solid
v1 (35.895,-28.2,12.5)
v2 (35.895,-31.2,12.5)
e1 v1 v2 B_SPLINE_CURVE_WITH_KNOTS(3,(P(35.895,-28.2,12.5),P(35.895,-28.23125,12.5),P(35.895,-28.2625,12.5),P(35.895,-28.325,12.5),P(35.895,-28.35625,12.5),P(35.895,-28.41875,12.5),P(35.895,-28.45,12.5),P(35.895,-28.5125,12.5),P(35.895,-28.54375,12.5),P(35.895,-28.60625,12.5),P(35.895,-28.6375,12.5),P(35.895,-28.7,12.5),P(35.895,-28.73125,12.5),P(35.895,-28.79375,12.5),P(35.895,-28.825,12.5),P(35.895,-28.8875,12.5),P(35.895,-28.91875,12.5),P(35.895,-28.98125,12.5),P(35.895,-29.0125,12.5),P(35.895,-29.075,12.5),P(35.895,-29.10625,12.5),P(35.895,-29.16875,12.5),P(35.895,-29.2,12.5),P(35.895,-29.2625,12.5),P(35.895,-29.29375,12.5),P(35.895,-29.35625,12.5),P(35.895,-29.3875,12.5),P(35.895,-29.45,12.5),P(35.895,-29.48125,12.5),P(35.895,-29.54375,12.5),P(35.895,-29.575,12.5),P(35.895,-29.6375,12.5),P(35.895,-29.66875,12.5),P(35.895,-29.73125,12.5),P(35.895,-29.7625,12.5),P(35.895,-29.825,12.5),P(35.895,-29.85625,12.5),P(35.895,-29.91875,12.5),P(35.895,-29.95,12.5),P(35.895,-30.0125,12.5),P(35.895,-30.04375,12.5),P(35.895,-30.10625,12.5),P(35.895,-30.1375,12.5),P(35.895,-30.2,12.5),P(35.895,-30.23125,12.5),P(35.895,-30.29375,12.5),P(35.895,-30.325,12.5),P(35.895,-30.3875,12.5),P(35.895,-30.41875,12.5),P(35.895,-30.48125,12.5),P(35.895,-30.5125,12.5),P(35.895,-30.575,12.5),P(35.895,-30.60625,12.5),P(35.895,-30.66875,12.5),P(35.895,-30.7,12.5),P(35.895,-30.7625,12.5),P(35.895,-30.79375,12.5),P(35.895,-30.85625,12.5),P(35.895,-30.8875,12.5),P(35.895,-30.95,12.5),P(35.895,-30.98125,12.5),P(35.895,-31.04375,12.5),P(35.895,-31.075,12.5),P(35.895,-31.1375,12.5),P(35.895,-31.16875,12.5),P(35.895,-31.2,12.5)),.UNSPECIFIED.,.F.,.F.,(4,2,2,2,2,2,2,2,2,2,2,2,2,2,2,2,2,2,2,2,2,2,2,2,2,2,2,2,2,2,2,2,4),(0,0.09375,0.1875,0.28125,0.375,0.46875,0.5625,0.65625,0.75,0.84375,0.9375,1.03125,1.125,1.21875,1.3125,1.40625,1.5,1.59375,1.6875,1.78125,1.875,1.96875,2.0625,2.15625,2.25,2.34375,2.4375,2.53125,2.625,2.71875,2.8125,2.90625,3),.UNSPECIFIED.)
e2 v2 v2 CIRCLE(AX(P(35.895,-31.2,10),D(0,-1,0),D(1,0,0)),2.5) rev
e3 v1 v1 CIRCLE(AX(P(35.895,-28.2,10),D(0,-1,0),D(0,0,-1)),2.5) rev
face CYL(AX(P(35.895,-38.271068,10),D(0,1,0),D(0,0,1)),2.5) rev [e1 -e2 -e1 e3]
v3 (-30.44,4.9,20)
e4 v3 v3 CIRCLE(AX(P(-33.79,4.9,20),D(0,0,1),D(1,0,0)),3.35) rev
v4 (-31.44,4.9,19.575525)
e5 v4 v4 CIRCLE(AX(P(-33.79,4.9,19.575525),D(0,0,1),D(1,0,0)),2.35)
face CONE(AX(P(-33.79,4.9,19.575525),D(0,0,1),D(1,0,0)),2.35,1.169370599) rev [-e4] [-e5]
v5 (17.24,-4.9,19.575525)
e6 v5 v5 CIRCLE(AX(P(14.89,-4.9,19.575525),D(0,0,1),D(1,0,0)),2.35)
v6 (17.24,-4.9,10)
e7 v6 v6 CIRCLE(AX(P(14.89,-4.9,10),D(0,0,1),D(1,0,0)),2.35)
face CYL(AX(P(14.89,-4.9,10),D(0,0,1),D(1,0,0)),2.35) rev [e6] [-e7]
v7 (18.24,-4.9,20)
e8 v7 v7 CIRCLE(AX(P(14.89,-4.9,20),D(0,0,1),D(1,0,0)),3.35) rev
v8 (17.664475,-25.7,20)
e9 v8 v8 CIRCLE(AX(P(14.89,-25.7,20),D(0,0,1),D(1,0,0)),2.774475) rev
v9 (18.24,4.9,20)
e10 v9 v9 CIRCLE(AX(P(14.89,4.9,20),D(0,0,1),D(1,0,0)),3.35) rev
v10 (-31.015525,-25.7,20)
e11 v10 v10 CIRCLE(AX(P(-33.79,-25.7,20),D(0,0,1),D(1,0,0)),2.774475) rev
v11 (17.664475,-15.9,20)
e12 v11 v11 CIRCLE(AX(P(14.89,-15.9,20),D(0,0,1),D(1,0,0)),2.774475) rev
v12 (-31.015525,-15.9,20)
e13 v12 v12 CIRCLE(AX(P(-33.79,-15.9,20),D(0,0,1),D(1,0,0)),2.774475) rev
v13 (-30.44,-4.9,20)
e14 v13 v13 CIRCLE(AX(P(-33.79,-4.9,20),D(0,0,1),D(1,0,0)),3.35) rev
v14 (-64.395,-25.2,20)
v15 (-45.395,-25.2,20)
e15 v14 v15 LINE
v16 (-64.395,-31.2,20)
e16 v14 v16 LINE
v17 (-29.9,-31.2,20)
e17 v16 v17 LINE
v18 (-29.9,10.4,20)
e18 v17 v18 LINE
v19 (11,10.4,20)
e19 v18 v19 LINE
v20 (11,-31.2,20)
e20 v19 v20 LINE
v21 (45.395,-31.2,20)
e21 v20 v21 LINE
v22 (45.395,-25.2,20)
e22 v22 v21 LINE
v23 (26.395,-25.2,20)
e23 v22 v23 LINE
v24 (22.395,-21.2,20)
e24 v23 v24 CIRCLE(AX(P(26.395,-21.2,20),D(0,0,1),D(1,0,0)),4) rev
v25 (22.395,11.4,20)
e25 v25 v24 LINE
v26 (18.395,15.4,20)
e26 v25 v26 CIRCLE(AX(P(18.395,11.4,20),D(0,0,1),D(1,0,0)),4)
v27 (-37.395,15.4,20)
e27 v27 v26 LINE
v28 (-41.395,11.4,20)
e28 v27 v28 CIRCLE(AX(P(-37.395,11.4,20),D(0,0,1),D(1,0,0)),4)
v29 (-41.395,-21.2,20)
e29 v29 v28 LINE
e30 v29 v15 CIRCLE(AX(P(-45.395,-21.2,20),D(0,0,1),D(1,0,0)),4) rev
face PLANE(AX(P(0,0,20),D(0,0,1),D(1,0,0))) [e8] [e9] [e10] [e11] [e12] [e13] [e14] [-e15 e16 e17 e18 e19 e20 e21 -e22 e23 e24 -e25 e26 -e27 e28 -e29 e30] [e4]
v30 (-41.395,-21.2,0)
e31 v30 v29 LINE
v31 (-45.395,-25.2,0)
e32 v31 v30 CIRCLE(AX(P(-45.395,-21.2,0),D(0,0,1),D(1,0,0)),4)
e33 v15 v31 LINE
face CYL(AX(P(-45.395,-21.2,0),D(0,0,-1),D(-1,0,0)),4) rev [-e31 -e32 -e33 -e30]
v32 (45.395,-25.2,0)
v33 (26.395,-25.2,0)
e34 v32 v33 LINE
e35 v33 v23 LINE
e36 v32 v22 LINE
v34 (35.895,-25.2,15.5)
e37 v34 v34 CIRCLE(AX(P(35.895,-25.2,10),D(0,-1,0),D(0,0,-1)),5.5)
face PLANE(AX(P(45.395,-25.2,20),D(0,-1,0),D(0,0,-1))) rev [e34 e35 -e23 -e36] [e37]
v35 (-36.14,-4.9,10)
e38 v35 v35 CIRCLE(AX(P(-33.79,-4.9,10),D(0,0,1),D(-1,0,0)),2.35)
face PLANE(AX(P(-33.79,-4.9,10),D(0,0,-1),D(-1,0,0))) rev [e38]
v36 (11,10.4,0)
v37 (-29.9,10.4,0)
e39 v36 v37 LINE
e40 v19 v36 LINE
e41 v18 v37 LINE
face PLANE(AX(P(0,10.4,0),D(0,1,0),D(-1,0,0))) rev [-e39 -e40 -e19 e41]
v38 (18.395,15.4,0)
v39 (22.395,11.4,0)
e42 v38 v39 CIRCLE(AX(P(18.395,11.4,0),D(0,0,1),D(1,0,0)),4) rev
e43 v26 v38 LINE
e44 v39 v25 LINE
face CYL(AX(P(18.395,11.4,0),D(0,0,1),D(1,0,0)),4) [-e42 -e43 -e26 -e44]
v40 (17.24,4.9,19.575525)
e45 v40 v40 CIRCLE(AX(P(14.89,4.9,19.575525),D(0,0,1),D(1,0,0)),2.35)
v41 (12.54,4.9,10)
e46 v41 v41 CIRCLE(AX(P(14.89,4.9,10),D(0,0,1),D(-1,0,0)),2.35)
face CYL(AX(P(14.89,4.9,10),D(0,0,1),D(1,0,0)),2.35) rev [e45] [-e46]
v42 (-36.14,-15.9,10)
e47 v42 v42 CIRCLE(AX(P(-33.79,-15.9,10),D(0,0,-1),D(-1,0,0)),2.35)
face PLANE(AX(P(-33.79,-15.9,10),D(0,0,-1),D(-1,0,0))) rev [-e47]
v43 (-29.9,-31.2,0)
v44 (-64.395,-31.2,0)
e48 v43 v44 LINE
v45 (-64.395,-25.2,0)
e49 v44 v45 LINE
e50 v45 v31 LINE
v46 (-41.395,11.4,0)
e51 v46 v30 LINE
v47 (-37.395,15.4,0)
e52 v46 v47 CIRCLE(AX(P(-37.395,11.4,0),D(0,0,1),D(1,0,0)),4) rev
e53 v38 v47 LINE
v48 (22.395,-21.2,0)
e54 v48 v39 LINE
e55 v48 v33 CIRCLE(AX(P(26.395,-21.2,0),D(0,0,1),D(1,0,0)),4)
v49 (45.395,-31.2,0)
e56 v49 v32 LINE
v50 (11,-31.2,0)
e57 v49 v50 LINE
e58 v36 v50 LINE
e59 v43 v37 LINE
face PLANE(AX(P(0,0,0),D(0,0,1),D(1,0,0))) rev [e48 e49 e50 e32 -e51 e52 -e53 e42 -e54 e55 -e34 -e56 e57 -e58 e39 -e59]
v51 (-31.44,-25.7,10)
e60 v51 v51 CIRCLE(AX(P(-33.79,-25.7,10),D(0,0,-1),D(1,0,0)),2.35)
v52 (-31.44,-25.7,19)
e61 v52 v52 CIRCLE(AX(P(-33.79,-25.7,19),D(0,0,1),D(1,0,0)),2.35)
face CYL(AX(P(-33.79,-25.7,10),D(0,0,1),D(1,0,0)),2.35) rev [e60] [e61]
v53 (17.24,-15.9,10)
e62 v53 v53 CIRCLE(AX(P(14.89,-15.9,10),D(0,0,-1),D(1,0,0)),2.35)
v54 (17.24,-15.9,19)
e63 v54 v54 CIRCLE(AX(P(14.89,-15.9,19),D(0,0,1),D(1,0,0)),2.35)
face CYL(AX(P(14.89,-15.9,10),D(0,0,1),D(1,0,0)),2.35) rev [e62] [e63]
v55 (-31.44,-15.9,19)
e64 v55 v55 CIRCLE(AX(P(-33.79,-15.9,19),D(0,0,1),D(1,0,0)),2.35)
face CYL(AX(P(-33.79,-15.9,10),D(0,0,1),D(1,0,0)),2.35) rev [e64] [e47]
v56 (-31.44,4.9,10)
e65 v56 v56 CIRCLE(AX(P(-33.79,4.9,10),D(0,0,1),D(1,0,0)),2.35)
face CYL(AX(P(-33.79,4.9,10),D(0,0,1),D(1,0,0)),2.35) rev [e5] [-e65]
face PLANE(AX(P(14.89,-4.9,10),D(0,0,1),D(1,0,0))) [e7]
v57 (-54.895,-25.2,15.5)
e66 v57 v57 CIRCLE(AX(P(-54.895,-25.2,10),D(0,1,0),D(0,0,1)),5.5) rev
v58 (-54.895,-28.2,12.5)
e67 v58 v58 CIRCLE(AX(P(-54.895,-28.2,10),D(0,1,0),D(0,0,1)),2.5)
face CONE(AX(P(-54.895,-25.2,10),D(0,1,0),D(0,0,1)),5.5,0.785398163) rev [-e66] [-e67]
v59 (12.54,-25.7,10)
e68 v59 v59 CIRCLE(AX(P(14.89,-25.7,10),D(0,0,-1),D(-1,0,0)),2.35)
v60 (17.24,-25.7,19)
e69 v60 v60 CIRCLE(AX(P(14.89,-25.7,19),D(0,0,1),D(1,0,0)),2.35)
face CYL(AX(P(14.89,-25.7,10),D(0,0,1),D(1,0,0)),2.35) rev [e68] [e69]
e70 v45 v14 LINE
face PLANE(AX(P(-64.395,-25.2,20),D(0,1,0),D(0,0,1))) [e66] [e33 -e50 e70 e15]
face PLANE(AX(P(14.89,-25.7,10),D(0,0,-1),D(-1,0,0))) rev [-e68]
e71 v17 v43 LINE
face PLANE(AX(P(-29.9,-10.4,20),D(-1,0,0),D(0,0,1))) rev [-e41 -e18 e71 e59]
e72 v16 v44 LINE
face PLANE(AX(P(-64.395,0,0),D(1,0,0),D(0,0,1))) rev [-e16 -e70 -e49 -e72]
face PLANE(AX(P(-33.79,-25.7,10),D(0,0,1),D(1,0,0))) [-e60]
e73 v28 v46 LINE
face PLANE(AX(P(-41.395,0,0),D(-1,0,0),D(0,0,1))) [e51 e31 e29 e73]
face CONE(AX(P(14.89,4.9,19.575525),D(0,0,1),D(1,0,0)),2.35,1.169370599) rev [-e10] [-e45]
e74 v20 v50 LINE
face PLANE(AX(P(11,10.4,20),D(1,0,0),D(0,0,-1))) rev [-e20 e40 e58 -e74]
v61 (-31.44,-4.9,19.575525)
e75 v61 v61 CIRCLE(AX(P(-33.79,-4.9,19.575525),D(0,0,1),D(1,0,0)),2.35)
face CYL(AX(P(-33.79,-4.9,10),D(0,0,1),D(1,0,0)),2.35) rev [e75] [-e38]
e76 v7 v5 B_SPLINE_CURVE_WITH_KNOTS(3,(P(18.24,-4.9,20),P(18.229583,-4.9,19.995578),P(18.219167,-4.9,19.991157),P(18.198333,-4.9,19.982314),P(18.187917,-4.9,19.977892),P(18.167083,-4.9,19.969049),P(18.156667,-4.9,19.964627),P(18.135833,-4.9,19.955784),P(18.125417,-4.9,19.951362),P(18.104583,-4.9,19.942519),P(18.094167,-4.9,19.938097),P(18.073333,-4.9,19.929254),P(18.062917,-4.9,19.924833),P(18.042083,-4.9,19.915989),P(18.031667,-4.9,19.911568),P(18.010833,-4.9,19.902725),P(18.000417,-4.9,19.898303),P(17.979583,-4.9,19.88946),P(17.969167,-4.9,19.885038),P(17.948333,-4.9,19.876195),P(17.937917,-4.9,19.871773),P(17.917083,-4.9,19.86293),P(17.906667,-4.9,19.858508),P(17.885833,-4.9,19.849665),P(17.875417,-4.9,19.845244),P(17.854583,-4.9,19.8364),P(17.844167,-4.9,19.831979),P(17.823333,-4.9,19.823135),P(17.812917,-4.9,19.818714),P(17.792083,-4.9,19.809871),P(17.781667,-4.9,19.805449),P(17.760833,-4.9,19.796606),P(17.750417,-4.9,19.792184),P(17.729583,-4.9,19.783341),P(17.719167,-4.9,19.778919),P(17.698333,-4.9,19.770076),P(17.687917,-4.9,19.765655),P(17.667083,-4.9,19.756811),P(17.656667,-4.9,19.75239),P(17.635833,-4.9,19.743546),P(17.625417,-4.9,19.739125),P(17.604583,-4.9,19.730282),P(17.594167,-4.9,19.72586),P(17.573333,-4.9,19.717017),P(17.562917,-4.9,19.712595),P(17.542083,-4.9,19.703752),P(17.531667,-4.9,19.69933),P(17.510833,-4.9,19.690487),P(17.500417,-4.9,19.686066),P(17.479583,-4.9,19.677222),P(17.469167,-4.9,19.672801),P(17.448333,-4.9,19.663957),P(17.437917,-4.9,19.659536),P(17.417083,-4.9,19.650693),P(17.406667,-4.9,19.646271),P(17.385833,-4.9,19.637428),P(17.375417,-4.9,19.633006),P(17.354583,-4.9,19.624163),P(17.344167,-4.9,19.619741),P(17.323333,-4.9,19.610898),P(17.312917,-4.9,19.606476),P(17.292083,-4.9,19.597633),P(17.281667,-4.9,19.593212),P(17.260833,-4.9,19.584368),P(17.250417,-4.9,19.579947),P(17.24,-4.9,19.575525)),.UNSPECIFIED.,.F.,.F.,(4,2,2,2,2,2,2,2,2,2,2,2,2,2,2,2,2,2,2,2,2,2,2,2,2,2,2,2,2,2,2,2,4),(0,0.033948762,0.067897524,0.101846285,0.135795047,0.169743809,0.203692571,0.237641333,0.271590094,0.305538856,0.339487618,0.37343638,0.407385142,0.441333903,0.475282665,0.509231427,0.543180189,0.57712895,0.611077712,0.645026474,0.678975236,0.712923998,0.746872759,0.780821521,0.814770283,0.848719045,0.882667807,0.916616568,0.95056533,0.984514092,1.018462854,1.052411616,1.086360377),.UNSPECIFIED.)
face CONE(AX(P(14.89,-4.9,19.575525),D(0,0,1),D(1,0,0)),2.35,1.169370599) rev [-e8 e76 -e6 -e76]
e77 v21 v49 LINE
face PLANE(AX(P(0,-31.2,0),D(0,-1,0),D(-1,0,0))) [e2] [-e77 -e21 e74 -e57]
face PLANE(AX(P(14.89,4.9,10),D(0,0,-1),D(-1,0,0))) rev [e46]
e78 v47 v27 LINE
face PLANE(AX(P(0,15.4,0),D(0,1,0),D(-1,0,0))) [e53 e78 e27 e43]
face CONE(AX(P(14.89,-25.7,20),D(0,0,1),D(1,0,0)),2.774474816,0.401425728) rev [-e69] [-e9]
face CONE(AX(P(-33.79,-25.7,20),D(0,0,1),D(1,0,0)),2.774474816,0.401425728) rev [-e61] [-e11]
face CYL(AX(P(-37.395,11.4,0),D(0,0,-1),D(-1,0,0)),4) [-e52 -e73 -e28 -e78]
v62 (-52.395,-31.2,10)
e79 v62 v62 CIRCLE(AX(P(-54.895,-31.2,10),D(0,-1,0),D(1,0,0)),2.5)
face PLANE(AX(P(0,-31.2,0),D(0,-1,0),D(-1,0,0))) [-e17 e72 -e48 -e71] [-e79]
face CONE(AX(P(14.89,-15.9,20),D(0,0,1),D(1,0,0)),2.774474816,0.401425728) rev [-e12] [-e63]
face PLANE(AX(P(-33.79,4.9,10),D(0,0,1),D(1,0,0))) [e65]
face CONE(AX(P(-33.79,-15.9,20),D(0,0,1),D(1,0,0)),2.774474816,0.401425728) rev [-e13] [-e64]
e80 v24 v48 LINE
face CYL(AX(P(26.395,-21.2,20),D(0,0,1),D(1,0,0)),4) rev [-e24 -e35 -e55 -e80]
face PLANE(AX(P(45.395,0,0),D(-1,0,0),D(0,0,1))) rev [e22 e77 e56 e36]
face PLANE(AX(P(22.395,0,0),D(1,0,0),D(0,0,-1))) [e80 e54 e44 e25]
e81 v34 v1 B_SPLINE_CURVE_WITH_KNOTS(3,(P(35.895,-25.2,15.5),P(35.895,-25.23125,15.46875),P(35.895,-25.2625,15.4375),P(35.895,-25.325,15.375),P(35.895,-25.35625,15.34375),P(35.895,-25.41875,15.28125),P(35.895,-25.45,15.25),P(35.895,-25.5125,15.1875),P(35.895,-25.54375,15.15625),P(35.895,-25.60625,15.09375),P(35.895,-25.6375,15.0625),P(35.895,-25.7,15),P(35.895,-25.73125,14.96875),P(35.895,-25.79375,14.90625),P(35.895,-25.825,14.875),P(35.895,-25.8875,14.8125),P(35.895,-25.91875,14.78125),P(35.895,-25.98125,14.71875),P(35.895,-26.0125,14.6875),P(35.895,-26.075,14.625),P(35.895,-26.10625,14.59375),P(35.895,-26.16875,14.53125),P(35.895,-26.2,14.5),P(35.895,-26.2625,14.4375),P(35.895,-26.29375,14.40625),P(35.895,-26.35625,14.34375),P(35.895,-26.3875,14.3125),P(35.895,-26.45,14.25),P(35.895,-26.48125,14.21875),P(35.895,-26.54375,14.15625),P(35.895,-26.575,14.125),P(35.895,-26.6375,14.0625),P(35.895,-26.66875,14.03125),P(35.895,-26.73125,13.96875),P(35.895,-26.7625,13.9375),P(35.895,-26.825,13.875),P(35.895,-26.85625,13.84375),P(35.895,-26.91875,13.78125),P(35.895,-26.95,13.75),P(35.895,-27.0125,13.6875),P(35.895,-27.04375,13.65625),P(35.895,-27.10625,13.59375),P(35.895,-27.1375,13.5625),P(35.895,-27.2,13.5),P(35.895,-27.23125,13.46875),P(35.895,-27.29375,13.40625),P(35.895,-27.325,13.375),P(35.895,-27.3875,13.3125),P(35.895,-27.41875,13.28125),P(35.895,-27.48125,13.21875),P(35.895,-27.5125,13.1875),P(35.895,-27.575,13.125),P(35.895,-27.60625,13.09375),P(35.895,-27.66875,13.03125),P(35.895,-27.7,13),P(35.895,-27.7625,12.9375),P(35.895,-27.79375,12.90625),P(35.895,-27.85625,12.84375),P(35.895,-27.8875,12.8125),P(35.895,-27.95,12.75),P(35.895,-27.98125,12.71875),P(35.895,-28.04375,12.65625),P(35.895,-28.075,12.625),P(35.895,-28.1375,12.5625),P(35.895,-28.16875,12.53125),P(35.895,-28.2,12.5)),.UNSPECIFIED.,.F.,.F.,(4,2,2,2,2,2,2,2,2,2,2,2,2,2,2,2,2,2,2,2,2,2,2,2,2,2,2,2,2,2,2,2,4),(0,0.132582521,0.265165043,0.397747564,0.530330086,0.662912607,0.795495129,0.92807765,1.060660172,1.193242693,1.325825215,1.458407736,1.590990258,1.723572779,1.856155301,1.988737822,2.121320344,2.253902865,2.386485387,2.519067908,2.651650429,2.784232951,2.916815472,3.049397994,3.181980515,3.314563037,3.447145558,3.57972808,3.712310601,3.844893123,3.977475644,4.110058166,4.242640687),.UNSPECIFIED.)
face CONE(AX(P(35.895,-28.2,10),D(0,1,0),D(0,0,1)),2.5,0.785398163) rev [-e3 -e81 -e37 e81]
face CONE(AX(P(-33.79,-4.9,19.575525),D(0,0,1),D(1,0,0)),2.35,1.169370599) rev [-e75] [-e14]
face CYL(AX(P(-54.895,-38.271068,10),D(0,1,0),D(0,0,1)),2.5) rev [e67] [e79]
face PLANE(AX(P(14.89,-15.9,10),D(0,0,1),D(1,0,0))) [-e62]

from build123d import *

# Parameters (mm, degrees)
SKETCH1_W             = 18.495
SKETCH1_H             = 20.8
SKETCH1_W_2           = 10
SKETCH1_W_3           = 37.395
BOSS_EXTRUDE1_DEPTH   = 20
SKETCH6_W             = 106.79
SKETCH6_H             = 20
BOSS_EXTRUDE4_DEPTH   = 5
SKETCH9_R             = 2.35
CUT_EXTRUDE1_DEPTH    = 10
SKETCH10_W            = 20
SKETCH10_H            = 25.8
CUT_EXTRUDE2_DEPTH    = 17
SKETCH11_W            = 20
SKETCH11_H            = 25.8
CUT_EXTRUDE3_DEPTH    = 26
CHAMFER1_SIZE         = 1
CHAMFER1_SIZE2        = 0.424474816
MIRROR1_2_OUTLINE_R   = 2.35
MIRROR1_2_OUTLINE_R_2 = 2.774474816
MIRROR1_2_DEPTH       = 20
MIRROR1_3_OUTLINE_R   = 2.35
MIRROR1_3_OUTLINE_R_2 = 2.774474816
MIRROR1_3_DEPTH       = 10
SKETCH12_W            = 63.79
SKETCH12_H            = 20
CUT_EXTRUDE4_DEPTH    = 5
SKETCH13_W            = 20
SKETCH13_H            = 6
BOSS_EXTRUDE5_DEPTH   = 23
FILLET2_R             = 4
SKETCH14_R            = 2.5
CUT_EXTRUDE5_DEPTH    = 6
CHAMFER2_SIZE         = 3


with BuildPart() as part:
    # Sketch1 → Boss-Extrude1 (new body)
    with BuildSketch(Plane.XY):
        with Locations((-39.1475, 0)):
            Rectangle(SKETCH1_W, SKETCH1_H)
        with Locations((-53.395, 0)):
            Rectangle(SKETCH1_W_2, SKETCH1_H)
        with Locations((29.6975, 0)):
            Rectangle(SKETCH1_W_3, SKETCH1_H)
    extrude(amount=BOSS_EXTRUDE1_DEPTH)

    # Sketch6 → Boss-Extrude4 (add)
    with BuildSketch(Plane(origin=(0, 10.4, 0), x_dir=(1, 0, 0), z_dir=(0, 1, 0))):
        with Locations((-5, -10)):
            Rectangle(SKETCH6_W, SKETCH6_H)
    extrude(amount=BOSS_EXTRUDE4_DEPTH)

    # Sketch9 → Cut-Extrude1 (cut)
    with BuildSketch(Plane.XY.offset(20)):
        with Locations((14.89, -4.9)):
            Circle(SKETCH9_R)
        with Locations(Location((14.89, 4.9, 0), (0, 0, 180))):
            Circle(SKETCH9_R)
        with Locations(Location((-33.79, -4.9, 0), (0, 0, 180))):
            Circle(SKETCH9_R)
        with Locations((-33.79, 4.9)):
            Circle(SKETCH9_R)
    extrude(amount=-CUT_EXTRUDE1_DEPTH, mode=Mode.SUBTRACT)

    # Sketch10 → Cut-Extrude2 (cut)
    with BuildSketch(Plane.ZY.offset(58.395)):
        with Locations((10, 2.5)):
            Rectangle(SKETCH10_W, SKETCH10_H)
    extrude(amount=-CUT_EXTRUDE2_DEPTH, mode=Mode.SUBTRACT)

    # Sketch11 → Cut-Extrude3 (cut)
    with BuildSketch(Plane(origin=(48.395, 0, 0), x_dir=(0, 0, -1), z_dir=(1, 0, 0))):
        with Locations((-10, 2.5)):
            Rectangle(SKETCH11_W, SKETCH11_H)
    extrude(amount=-CUT_EXTRUDE3_DEPTH, mode=Mode.SUBTRACT)

    # Chamfer1
    chamfer1_edges = [part.edges().sort_by_distance(p)[0] for p in [
        (17.24, 4.9, 20),
        (-31.44, -4.9, 20),
        (-36.14, 4.9, 20),
        (12.54, -4.9, 20),
    ]]
    chamfer1_side = [part.faces().sort_by_distance(p)[0] for p in [
        (-35.6475, -9.711900872, 20),
    ]]
    chamfer(chamfer1_edges, length=CHAMFER1_SIZE, length2=CHAMFER1_SIZE2, reference=chamfer1_side[0])



with BuildPart() as body_2:
    # Mirror1: read off the stored shape, not the designer's step
    # Mirror1 outline → Mirror1 (revolve)
    with BuildSketch(Plane(origin=(14.89, -25.7, 0), x_dir=(1, 0, 0), z_dir=(0, -1, 0))):
        Polygon((2.35, 19), (2.35, 10), (2.774474816, 10), (2.774474816, 20), align=None)
    revolve(axis=Axis((14.89, -25.7, 0), (0, 0, 1)))


with BuildPart() as part_1:
    add(part.part)

    add(body_2.part)  # Mirror1 2 merges body 2
    # Mirror1 2 outline → Mirror1 2 (add)
    with BuildSketch(Plane.XY):
        Polygon((-41.395, -10.4), (-41.395, -36.2), (22.395, -36.2), (22.395, -10.4), (11, -10.4), (11, -31.2), (-29.9, -31.2), (-29.9, -10.4), align=None)
        with Locations((-33.79, -25.7)):
            Circle(MIRROR1_2_OUTLINE_R, mode=Mode.SUBTRACT)
        with Locations((14.89, -25.7)):
            Circle(MIRROR1_2_OUTLINE_R_2, mode=Mode.SUBTRACT)
        with Locations((-33.79, -15.9)):
            Circle(MIRROR1_2_OUTLINE_R, mode=Mode.SUBTRACT)
        with Locations((14.89, -15.9)):
            Circle(MIRROR1_2_OUTLINE_R, mode=Mode.SUBTRACT)
    extrude(amount=MIRROR1_2_DEPTH)

    # Mirror1 3 outline → Mirror1 3 (add)
    with BuildSketch(Plane.XY):
        with Locations((14.89, -15.9)):
            Circle(MIRROR1_3_OUTLINE_R)
        with Locations((-33.79, -25.7)):
            Circle(MIRROR1_3_OUTLINE_R)
        with Locations((-33.79, -15.9)):
            Circle(MIRROR1_3_OUTLINE_R)
        with Locations((14.89, -25.7)):
            Circle(MIRROR1_3_OUTLINE_R_2)
    extrude(amount=MIRROR1_3_DEPTH)

    # Mirror1 4: loft between two sections, ruled curve by curve
    mirror1_4_from = [
        Edge.make_three_point_arc((17.24, -15.9, 19), (14.89, -13.55, 19), (12.54, -15.9, 19)),
        Edge.make_three_point_arc((12.54, -15.9, 19), (14.89, -18.25, 19), (17.24, -15.9, 19)),
    ]
    mirror1_4_to = [
        Edge.make_three_point_arc((17.664474816, -15.9, 20), (14.89, -13.125525184, 20), (12.115525184, -15.9, 20)),
        Edge.make_three_point_arc((12.115525184, -15.9, 20), (14.89, -18.674474816, 20), (17.664474816, -15.9, 20)),
    ]
    mirror1_4 = Solid(Shell([*[Face.make_surface_from_curves(mirror1_4_from[k], mirror1_4_to[k]) for k in range(2)], Face(Wire(mirror1_4_from)), Face(Wire(mirror1_4_to))]))
    add(mirror1_4, mode=Mode.SUBTRACT)

    # Mirror1 5: loft between two sections, ruled curve by curve
    mirror1_5_from = [
        Edge.make_three_point_arc((-31.44, -25.7, 19), (-33.79, -23.35, 19), (-36.14, -25.7, 19)),
        Edge.make_three_point_arc((-36.14, -25.7, 19), (-33.79, -28.05, 19), (-31.44, -25.7, 19)),
    ]
    mirror1_5_to = [
        Edge.make_three_point_arc((-31.015525184, -25.7, 20), (-33.79, -22.925525184, 20), (-36.564474816, -25.7, 20)),
        Edge.make_three_point_arc((-36.564474816, -25.7, 20), (-33.79, -28.474474816, 20), (-31.015525184, -25.7, 20)),
    ]
    mirror1_5 = Solid(Shell([*[Face.make_surface_from_curves(mirror1_5_from[k], mirror1_5_to[k]) for k in range(2)], Face(Wire(mirror1_5_from)), Face(Wire(mirror1_5_to))]))
    add(mirror1_5, mode=Mode.SUBTRACT)

    # Mirror1 6: loft between two sections, ruled curve by curve
    mirror1_6_from = [
        Edge.make_three_point_arc((-31.44, -15.9, 19), (-33.79, -13.55, 19), (-36.14, -15.9, 19)),
        Edge.make_three_point_arc((-36.14, -15.9, 19), (-33.79, -18.25, 19), (-31.44, -15.9, 19)),
    ]
    mirror1_6_to = [
        Edge.make_three_point_arc((-31.015525184, -15.9, 20), (-33.79, -13.125525184, 20), (-36.564474816, -15.9, 20)),
        Edge.make_three_point_arc((-36.564474816, -15.9, 20), (-33.79, -18.674474816, 20), (-31.015525184, -15.9, 20)),
    ]
    mirror1_6 = Solid(Shell([*[Face.make_surface_from_curves(mirror1_6_from[k], mirror1_6_to[k]) for k in range(2)], Face(Wire(mirror1_6_from)), Face(Wire(mirror1_6_to))]))
    add(mirror1_6, mode=Mode.SUBTRACT)

    # Sketch12 → Cut-Extrude4 (cut)
    with BuildSketch(Plane(origin=(0, -36.2, 0), x_dir=(-1, 0, 0), z_dir=(0, -1, 0))):
        with Locations((9.5, -10)):
            Rectangle(SKETCH12_W, SKETCH12_H)
    extrude(amount=-CUT_EXTRUDE4_DEPTH, mode=Mode.SUBTRACT)

    # Sketch13 → Boss-Extrude5 (add)
    with BuildSketch(Plane(origin=(22.395, 0, 0), x_dir=(0, 0, -1), z_dir=(1, 0, 0))):
        with Locations((-10, -28.2)):
            Rectangle(SKETCH13_W, SKETCH13_H)
    boss_extrude5 = extrude(amount=BOSS_EXTRUDE5_DEPTH)

    # Mirror2: Boss-Extrude5 across plane
    add(boss_extrude5.mirror(Plane(origin=(-9.5, 0, 0), x_dir=(0, 0, 1), z_dir=(1, 0, 0))))

    # Fillet2
    fillet2_edges = [part_1.edges().sort_by_distance(p)[0] for p in [
        (22.395, -25.2, 10),
        (-41.395, -25.2, 10),
        (-41.395, 15.4, 10),
        (22.395, 15.4, 10),
    ]]
    fillet(fillet2_edges, radius=FILLET2_R)

    # Sketch14 → Cut-Extrude5 (cut)
    with BuildSketch(Plane(origin=(0, -25.2, 0), x_dir=(1, 0, 0), z_dir=(0, 1, 0))):
        with Locations(Location((35.895, -10, 0), (0, 0, 270))):
            Circle(SKETCH14_R)
    cut_extrude5 = extrude(amount=-CUT_EXTRUDE5_DEPTH, mode=Mode.SUBTRACT)

    # Mirror5: Cut-Extrude5 across plane
    add(cut_extrude5.mirror(Plane(origin=(-9.5, 0, 0), x_dir=(0, 0, 1), z_dir=(1, 0, 0))), mode=Mode.SUBTRACT)

    # Chamfer2
    chamfer2_edges = [part_1.edges().sort_by_distance(p)[0] for p in [
        (35.895, -25.2, 7.5),
        (-54.895, -25.2, 7.5),
    ]]
    chamfer(chamfer2_edges, length=CHAMFER2_SIZE)


solid = part_1.part
